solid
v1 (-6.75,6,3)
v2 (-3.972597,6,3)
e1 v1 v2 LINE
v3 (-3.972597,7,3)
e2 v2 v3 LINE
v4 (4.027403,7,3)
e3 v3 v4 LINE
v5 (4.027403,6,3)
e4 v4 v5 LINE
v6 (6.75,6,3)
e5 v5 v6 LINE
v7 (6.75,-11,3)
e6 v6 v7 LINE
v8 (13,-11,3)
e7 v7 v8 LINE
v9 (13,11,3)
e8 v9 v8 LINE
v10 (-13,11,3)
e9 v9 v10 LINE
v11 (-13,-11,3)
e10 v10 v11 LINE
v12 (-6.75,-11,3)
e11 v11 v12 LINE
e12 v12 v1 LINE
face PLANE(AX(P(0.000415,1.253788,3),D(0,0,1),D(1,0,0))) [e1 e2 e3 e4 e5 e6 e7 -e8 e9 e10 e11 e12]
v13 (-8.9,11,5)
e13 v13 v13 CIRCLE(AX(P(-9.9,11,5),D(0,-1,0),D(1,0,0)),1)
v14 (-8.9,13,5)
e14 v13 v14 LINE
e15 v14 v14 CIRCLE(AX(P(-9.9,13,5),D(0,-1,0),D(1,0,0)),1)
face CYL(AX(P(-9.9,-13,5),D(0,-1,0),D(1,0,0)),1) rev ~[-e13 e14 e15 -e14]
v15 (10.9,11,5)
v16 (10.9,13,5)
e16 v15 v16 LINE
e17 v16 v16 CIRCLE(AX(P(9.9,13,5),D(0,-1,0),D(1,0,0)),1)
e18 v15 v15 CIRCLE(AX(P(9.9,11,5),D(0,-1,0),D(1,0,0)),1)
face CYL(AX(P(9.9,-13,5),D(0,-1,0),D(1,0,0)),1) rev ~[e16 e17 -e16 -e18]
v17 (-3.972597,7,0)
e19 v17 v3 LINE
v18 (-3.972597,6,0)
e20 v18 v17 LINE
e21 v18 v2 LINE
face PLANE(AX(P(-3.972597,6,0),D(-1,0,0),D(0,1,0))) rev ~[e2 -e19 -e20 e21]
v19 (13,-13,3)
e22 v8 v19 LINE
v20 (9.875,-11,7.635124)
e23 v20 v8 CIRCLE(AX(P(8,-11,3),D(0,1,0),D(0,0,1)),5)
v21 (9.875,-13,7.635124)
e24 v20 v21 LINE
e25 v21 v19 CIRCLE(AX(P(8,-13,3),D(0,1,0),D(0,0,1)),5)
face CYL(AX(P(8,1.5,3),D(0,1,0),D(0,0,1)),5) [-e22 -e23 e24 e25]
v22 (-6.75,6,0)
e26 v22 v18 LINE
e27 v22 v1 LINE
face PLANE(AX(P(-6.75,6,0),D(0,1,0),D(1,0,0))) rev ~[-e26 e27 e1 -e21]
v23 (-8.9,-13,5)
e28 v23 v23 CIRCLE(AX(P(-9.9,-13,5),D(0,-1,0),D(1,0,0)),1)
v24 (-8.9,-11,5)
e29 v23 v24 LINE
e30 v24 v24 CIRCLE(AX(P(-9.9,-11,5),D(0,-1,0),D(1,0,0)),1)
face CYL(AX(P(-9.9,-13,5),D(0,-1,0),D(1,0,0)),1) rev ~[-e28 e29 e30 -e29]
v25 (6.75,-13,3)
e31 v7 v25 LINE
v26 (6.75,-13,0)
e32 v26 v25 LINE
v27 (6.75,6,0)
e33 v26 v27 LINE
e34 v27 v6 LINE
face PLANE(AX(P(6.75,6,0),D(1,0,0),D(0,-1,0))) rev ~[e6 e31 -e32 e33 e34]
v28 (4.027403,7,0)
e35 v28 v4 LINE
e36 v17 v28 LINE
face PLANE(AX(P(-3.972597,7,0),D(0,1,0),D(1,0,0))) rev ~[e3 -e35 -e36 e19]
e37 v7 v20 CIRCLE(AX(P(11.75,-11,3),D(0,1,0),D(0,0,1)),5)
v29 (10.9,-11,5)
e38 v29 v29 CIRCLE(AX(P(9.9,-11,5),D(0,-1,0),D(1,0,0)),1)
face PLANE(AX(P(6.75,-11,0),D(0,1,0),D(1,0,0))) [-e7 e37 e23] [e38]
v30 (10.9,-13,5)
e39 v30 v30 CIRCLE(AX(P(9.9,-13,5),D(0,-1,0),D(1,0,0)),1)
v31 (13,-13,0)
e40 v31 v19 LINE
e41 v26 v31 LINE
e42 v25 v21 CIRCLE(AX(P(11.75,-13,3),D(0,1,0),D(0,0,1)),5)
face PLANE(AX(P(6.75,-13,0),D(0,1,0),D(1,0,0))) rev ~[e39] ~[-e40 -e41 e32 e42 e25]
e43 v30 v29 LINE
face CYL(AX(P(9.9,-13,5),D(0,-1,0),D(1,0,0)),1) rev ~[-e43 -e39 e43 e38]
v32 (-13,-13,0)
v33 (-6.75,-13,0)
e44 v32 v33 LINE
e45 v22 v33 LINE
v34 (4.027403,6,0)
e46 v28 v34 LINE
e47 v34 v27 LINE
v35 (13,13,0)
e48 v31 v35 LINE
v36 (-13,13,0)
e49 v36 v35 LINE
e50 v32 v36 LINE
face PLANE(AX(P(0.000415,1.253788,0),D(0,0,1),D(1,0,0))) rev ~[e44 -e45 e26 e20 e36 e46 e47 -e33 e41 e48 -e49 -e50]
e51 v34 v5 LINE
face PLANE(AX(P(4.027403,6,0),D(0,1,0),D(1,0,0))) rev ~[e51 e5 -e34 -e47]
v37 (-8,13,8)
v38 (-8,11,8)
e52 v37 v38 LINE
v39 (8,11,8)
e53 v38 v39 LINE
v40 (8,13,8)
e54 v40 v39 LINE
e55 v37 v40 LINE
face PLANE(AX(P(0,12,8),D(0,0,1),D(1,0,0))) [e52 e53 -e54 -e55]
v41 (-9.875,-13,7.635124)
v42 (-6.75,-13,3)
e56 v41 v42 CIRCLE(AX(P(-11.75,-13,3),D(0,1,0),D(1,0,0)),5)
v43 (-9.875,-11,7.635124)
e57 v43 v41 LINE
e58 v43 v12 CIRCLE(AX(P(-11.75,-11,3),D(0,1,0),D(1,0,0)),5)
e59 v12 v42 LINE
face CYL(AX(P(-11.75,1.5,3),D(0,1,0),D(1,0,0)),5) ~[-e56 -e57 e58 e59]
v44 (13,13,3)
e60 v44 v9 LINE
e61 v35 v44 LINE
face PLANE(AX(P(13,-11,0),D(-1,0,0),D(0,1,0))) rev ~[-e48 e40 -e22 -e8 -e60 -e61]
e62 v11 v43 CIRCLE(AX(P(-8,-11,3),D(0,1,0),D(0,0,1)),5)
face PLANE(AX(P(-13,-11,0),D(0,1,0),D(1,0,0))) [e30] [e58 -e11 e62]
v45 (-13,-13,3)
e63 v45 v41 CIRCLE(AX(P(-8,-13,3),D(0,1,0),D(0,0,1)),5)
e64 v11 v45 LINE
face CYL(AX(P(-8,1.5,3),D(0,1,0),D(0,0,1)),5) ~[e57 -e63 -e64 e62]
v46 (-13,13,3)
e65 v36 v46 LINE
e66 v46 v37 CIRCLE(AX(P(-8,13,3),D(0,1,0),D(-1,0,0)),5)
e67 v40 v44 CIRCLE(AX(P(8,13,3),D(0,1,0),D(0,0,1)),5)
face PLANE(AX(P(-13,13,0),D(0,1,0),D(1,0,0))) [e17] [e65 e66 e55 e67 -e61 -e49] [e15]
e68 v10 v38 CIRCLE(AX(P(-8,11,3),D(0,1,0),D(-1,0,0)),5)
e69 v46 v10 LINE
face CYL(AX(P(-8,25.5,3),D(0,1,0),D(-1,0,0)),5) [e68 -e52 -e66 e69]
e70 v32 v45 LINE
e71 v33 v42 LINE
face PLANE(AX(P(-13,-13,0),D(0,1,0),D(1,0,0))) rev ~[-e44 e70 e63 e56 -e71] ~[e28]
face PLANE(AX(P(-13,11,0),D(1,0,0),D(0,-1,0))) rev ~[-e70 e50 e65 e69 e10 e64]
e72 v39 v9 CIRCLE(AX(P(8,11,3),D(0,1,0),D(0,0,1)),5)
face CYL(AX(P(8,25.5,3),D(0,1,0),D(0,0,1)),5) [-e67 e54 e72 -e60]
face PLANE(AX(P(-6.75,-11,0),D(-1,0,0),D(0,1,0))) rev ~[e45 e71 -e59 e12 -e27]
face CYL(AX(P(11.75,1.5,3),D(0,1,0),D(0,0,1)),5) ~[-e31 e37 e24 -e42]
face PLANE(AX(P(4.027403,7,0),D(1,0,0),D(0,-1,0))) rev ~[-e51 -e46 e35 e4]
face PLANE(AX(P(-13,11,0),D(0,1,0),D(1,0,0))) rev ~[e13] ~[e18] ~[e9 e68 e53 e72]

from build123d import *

# Parameters (mm, degrees)
F0_W        = 26
F0_H        = 2
F1_DEPTH    = 8
F0_W_2      = 6.25
F2_DEPTH    = 3
F3_T1_DEPTH = 27
F3_T3_DEPTH = 27
F4_R        = 1
F5_DEPTH    = 30


# Not quite as in the source:
# - a fillet or chamfer that OpenCascade refuses, or shapes differently, is made with other operations: its cross-section is extruded or revolved along the edge and cut away or added


with BuildPart() as f1:
    # F0 (on Top) → F1 (new body)
    with BuildSketch(Plane.XY):
        with Locations((0, 12)):
            Rectangle(F0_W, F0_H)
    extrude(amount=F1_DEPTH)



with BuildPart() as f1b:
    # F0 (on Top) → F1, piece 2 (new body)
    with BuildSketch(Plane.XY):
        with Locations((-9.875, -12)):
            Rectangle(F0_W_2, F0_H)
    extrude(amount=F1_DEPTH)


with BuildPart() as f1c:
    # F0 (on Top) → F1, piece 3 (new body)
    with BuildSketch(Plane.XY):
        with Locations((9.875, -12)):
            Rectangle(F0_W_2, F0_H)
    extrude(amount=F1_DEPTH)


with BuildPart() as f1_1:
    add(f1.part)

    add(f1b.part)  # F2 merges F1b

    add(f1c.part)  # F2 merges F1c
    # F0 (on Top) → F2 (join)
    with BuildSketch(Plane.XY):
        Polygon((6.75, -11), (13, -11), (13, 11), (-13, 11), (-13, -11), (-6.75, -11), (-6.75, 6), (-3.9725974202, 6), (-3.9725974202, 7), (4.0274025798, 7), (4.0274025798, 6), (6.75, 6), align=None)
    extrude(amount=F2_DEPTH)

    # F3: fillet of radius 5 on 6 edges, made by hand

    # F3_s2 → F3_t1 (cut)
    with BuildSketch(Plane.XZ.offset(-1.5)):
        with BuildLine():
            ThreePointArc((-8, 8), (-11.5355339059, 6.5355339059), (-13, 3))
            Line((-13, 3), (-13, 8))
            Line((-13, 8), (-8, 8))
        make_face()
        with BuildLine():
            ThreePointArc((-6.75, 3), (-8.2144660941, 6.5355339059), (-11.75, 8))
            Line((-11.75, 8), (-6.75, 8))
            Line((-6.75, 8), (-6.75, 3))
        make_face()
        with BuildLine():
            ThreePointArc((11.75, 8), (8.2144660941, 6.5355339059), (6.75, 3))
            Line((6.75, 3), (6.75, 8))
            Line((6.75, 8), (11.75, 8))
        make_face()
        with BuildLine():
            ThreePointArc((8, 8), (11.5355339059, 6.5355339059), (13, 3))
            Line((13, 3), (13, 8))
            Line((13, 8), (8, 8))
        make_face()
    extrude(amount=F3_T1_DEPTH, mode=Mode.SUBTRACT)

    # F3_s4 → F3_t3 (cut)
    with BuildSketch(Plane.XZ.offset(-25.5)):
        with BuildLine():
            ThreePointArc((8, 8), (11.5355339059, 6.5355339059), (13, 3))
            Line((13, 3), (13, 8))
            Line((13, 8), (8, 8))
        make_face()
        with BuildLine():
            ThreePointArc((-13, 3), (-11.5355339059, 6.5355339059), (-8, 8))
            Line((-8, 8), (-13, 8))
            Line((-13, 8), (-13, 3))
        make_face()
    extrude(amount=F3_T3_DEPTH, mode=Mode.SUBTRACT)

    # F4 (on face) → F5 (cut)
    with BuildSketch(Plane.XZ.offset(13)):
        with Locations((-9.9, 5)):
            Circle(F4_R)
        with Locations((9.9, 5)):
            Circle(F4_R)
    extrude(amount=-F5_DEPTH, mode=Mode.SUBTRACT)


solid = f1_1.part
